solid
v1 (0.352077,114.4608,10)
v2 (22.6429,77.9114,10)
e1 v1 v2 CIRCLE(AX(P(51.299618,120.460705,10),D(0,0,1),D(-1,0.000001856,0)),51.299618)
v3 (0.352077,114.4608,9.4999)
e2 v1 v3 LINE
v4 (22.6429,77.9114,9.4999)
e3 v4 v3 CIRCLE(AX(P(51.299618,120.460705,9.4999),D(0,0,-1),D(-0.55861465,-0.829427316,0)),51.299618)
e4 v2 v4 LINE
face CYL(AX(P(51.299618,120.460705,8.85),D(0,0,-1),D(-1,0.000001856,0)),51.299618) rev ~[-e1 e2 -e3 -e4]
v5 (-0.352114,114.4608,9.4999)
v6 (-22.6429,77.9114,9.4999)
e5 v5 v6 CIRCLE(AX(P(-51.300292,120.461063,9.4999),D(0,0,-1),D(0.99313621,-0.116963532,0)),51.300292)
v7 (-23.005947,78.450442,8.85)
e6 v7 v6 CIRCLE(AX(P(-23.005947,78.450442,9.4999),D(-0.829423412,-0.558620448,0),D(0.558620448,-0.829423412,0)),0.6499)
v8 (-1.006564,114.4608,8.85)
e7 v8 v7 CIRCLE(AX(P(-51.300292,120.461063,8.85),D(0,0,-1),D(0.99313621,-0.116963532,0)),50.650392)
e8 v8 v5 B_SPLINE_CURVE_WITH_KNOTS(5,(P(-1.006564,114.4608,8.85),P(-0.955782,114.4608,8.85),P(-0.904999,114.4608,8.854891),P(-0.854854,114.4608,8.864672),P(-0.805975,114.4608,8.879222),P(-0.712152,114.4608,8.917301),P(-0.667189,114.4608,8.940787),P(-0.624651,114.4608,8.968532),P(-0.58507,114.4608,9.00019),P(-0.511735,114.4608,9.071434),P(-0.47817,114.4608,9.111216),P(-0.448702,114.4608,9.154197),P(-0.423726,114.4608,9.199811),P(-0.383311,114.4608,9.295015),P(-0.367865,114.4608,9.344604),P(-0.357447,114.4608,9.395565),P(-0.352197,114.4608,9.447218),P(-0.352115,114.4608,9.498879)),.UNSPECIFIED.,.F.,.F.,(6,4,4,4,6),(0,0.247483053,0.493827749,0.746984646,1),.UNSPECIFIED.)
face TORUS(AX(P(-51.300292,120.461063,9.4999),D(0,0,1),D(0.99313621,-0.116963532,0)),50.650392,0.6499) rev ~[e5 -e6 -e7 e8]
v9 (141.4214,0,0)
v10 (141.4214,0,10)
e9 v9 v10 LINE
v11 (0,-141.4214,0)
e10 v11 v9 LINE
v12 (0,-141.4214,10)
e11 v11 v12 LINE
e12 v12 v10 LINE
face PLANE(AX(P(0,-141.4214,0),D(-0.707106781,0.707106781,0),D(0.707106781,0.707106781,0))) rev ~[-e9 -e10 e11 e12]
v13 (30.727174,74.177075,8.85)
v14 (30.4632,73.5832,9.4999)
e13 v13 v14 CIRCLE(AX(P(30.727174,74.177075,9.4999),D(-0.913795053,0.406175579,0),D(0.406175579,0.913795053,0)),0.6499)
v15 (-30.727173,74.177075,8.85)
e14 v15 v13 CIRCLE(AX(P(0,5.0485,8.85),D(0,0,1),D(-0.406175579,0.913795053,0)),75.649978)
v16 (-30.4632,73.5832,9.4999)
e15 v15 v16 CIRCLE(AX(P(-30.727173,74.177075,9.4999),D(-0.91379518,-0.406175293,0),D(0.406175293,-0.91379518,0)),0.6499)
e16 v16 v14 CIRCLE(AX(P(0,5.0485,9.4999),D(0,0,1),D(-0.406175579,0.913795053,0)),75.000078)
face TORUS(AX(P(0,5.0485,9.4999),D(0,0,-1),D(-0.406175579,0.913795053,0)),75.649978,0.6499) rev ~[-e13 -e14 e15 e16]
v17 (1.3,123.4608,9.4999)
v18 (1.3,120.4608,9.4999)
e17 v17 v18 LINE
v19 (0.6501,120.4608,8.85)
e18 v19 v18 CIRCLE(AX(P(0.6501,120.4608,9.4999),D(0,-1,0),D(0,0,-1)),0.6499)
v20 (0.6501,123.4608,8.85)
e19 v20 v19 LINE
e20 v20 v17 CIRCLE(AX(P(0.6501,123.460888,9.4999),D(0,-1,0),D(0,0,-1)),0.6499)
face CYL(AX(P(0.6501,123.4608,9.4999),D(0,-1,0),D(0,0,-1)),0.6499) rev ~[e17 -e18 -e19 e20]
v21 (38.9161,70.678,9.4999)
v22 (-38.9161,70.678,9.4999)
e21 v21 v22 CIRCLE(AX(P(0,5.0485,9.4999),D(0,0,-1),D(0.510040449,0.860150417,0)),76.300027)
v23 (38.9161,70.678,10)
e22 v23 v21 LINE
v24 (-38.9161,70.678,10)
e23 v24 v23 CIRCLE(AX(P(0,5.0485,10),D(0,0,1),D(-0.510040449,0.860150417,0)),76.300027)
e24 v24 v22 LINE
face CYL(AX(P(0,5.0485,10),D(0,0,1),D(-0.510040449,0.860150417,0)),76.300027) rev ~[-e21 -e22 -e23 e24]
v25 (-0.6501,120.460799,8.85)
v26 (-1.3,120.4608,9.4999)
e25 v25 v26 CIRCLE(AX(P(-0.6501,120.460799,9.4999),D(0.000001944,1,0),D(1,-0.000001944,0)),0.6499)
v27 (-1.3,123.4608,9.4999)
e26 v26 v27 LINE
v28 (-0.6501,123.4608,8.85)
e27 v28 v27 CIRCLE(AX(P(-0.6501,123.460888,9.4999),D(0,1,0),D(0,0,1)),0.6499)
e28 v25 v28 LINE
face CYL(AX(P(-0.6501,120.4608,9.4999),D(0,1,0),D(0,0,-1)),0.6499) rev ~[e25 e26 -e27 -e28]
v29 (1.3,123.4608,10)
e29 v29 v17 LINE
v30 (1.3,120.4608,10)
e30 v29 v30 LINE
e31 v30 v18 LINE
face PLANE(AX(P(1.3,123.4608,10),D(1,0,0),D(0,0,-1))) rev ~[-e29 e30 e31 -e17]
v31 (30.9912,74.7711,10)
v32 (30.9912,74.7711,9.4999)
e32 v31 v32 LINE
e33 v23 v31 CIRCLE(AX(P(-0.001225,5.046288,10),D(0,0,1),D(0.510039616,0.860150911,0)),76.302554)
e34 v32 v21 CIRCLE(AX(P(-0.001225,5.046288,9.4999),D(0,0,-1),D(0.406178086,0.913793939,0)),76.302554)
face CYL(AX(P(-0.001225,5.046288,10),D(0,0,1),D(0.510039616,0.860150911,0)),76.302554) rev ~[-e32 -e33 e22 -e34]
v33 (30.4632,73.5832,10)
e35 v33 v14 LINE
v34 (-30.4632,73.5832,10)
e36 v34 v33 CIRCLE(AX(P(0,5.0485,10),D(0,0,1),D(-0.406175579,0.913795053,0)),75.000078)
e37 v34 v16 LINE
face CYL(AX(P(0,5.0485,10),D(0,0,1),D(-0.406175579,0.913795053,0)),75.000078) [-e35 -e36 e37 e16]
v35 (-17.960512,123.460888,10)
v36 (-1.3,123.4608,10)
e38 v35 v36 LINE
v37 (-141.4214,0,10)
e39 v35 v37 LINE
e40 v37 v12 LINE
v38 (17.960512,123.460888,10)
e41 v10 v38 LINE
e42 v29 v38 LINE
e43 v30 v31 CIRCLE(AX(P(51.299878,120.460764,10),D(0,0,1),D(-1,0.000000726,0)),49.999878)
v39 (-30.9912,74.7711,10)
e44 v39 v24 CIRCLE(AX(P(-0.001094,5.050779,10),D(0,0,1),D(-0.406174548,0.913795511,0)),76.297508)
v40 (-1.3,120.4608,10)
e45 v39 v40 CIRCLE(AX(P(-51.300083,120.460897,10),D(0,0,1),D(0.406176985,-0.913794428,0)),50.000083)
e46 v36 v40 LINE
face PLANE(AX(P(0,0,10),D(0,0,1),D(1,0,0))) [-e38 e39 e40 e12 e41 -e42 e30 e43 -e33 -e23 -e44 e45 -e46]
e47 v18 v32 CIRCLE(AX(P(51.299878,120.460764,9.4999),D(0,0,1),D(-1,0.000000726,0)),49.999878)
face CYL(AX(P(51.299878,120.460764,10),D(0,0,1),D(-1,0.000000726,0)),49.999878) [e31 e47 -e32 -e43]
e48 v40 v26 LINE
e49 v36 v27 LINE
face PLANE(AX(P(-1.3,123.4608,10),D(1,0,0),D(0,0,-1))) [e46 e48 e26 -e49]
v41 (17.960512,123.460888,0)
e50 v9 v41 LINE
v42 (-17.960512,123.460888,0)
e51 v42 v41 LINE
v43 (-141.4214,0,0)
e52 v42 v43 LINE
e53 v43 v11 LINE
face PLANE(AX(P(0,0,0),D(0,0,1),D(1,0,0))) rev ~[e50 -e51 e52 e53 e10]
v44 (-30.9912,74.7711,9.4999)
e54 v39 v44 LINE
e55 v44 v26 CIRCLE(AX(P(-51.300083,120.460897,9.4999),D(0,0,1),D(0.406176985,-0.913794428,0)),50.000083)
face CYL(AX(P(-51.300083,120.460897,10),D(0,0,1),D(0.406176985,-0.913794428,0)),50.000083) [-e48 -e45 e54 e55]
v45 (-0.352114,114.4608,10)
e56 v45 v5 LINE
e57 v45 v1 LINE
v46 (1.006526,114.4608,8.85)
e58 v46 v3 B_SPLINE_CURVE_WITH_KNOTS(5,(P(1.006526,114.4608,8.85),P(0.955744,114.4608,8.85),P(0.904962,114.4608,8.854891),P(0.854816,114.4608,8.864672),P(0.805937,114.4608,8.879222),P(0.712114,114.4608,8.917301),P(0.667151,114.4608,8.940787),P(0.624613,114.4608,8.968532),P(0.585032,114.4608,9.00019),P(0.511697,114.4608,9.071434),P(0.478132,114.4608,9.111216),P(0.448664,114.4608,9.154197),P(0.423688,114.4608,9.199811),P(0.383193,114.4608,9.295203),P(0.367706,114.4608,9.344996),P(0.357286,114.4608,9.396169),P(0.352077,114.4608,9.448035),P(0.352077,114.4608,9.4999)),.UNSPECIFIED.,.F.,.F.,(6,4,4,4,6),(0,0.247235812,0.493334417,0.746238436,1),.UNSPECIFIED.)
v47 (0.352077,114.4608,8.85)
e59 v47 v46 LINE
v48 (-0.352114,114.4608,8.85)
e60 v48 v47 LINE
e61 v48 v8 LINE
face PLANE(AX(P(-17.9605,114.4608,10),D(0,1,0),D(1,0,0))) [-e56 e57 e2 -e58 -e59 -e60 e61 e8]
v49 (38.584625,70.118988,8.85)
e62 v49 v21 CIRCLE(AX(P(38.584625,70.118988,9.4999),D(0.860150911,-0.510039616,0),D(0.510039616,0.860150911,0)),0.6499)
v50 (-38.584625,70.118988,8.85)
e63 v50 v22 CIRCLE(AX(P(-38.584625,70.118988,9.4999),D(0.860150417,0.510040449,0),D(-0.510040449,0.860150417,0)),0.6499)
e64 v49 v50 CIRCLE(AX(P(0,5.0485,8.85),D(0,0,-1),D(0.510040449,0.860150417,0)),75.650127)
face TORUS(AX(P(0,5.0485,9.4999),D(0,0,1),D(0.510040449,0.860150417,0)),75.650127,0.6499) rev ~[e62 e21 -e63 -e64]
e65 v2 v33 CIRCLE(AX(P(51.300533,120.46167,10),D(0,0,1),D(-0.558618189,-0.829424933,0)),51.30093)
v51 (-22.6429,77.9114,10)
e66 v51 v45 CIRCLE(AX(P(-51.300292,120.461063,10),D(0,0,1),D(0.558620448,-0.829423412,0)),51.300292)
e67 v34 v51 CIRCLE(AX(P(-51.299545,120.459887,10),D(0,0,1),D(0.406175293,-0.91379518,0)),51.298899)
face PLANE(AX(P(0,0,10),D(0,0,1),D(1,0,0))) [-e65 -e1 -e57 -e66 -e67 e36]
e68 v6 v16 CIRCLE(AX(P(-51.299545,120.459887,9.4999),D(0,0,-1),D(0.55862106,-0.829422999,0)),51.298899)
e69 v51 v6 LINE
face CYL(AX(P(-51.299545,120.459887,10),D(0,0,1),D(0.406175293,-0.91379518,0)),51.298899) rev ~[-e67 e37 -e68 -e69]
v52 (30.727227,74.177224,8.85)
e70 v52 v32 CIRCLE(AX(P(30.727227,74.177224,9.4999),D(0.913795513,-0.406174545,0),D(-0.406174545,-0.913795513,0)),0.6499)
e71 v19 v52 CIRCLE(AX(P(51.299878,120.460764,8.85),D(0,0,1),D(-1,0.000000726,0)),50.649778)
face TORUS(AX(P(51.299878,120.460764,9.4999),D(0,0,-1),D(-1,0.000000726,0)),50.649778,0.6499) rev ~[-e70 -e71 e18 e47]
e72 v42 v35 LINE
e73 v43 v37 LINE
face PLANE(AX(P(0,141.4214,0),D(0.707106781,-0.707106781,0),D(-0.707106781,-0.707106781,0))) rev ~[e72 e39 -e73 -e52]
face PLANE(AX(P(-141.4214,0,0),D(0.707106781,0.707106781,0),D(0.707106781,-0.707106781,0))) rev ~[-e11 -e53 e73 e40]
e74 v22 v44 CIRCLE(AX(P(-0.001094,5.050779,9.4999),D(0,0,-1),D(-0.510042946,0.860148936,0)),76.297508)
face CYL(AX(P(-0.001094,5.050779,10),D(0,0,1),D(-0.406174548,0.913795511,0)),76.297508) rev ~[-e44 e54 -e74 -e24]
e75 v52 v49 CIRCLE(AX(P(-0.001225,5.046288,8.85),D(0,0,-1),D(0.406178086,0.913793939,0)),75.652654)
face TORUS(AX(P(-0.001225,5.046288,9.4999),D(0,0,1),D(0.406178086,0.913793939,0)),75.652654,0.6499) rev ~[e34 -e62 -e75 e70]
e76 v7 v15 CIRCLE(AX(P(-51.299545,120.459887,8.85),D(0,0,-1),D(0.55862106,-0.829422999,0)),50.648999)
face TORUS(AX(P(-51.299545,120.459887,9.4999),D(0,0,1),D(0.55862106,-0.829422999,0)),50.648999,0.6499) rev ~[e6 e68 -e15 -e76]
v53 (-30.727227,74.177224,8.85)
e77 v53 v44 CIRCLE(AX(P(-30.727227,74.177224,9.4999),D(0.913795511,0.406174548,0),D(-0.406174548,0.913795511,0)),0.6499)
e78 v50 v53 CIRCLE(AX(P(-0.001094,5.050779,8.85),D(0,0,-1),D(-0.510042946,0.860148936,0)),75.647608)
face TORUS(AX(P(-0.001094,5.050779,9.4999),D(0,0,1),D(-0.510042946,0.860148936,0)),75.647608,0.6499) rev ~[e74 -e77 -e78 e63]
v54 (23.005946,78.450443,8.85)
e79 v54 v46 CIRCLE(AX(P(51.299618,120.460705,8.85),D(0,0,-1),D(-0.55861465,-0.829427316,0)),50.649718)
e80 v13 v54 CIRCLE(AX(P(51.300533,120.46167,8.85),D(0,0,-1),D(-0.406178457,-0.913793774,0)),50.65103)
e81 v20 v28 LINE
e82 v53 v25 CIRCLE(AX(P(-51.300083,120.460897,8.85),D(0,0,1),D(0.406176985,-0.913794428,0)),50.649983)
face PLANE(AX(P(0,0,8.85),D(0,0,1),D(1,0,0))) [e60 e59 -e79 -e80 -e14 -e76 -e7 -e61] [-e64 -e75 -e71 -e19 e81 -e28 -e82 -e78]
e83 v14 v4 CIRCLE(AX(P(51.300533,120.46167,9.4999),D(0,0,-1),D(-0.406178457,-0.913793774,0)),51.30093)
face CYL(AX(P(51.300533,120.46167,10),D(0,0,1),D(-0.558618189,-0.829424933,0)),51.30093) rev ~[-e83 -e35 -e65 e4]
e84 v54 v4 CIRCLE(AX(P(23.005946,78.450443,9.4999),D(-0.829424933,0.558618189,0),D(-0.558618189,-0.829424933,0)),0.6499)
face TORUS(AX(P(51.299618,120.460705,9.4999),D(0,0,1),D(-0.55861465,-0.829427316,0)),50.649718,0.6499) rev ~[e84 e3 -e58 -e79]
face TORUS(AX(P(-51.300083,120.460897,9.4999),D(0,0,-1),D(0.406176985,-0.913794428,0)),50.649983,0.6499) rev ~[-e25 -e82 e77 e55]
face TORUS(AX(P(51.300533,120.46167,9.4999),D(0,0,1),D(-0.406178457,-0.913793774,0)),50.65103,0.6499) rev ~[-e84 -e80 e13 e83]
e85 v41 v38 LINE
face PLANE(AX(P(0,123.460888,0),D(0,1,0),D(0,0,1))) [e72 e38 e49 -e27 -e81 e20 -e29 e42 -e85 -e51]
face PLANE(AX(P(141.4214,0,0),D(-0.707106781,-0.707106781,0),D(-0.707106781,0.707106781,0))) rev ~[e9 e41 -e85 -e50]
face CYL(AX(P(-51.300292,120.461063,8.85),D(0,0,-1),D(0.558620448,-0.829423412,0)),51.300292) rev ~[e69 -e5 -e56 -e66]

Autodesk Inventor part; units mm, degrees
ref_plane "YZ Plane" through (0, 0, 0) normal (1, 0, 0) x (0, 1, 0)
ref_plane "XZ Plane" through (0, 0, 0) normal (0, 1, 0) x (-1, 0, 0)
ref_plane "XY Plane" through (0, 0, 0) normal (0, 0, 1) x (1, 0, 0)
sketch "Sketch11" plane through (0, 0, 0) normal (0, 0, 1) x (1, 0, 0)
  line L0 (0, -141.4214) -> (141.4214, 0)
  line L1 (141.4214, 0) -> (0, 141.4214)
  line L2 (0, 141.4214) -> (-141.4214, 0)
  line L3 (-141.4214, 0) -> (0, -141.4214)
  line L4 (0, -141.4214) -> (0, 141.4214) construction
  line L5 (141.4214, 0) -> (-141.4214, 0) construction
  line L6 (0, -141.4214) -> (200, -141.4214) construction
  point P0 (0, 0)
  dimension "d80" = 200
  dimension "d81" = 45
  dimension "d82" = 200
extrude "Extrusion12" add sketch "Sketch11" along normal blind 10
chamfer "Chamfer1" distance 25.4 angle 45 1 edges at (0, 141.4214, 5)
sketch "Sketch13" plane through (0, 0, 10) normal (0, 0, 1) x (1, 0, 0)
  line L0 (72.5, 123.4608) -> (-72.5, 123.4608)
  arc A0 (-30.4632, 73.5832) -> (30.4632, 73.5832) centre (0, 5.0485) ccw
  arc A1 (-30.9912, 74.7711) -> (-38.9161, 70.678) centre (0, 5.0485) ccw
  arc A2 (-30.9912, 74.7711) -> (-1.3, 120.4608) centre (-51.3, 120.4608) ccw
  arc A3 (30.9912, 74.7711) -> (80.4111, 79.8094) centre (51.3, 120.4608) ccw
  arc A4 (-38.9161, 70.678) -> (-30.4632, 73.5832) centre (-51.3, 120.4608) ccw
  arc A5 (22.6429, 77.9114) -> (30.4632, 73.5832) centre (51.3, 120.4608) ccw
  line L1 (-51.3, 120.4608) -> (51.3, 120.4608)
  arc A6 (-80.4111, 79.8094) -> (-30.9912, 74.7711) centre (-51.3, 120.4608) ccw
  arc A7 (-80.3294, 78.1644) -> (-38.9161, 70.678) centre (-51.3, 120.4608) ccw
  arc A8 (-1.3, 120.4608) -> (-80.4111, 79.8094) centre (-51.3, 120.4608) ccw
  arc A9 (-30.4632, 73.5832) -> (-22.6429, 77.9114) centre (-51.3, 120.4608) ccw
  arc A10 (30.4632, 73.5832) -> (-30.4632, 73.5832) centre (0, 5.0485) ccw
  arc A11 (-22.6429, 77.9114) -> (-30.9912, 74.7711) centre (0, 5.0485) ccw
  arc A12 (-38.9161, 70.678) -> (38.9161, 70.678) centre (0, 5.0485) ccw
  arc A13 (22.6429, 77.9114) -> (-22.6429, 77.9114) centre (0, 5.0485) ccw
  arc A14 (30.9912, 74.7711) -> (22.6429, 77.9114) centre (0, 5.0485) ccw
  arc A15 (0, 120.4608) -> (22.6429, 77.9114) centre (51.3, 120.4608) ccw
  arc A16 (1.3, 120.4608) -> (30.9912, 74.7711) centre (51.3, 120.4608) ccw
  arc A17 (0, 120.4608) -> (-80.3294, 78.1644) centre (-51.3, 120.4608) ccw
  arc A18 (-22.6429, 77.9114) -> (0, 120.4608) centre (-51.3, 120.4608) ccw
  arc A19 (30.4632, 73.5832) -> (38.9161, 70.678) centre (51.3, 120.4608) ccw
  arc A20 (38.9161, 70.678) -> (30.9912, 74.7711) centre (0, 5.0485) ccw
  arc A21 (38.9161, 70.678) -> (102.4649, 116.7406) centre (51.3, 120.4608) ccw
  arc A22 (80.4111, 79.8094) -> (1.3, 120.4608) centre (51.3, 120.4608) ccw
  arc A23 (102.4649, 116.7406) -> (0, 120.4608) centre (51.3, 120.4608) ccw
  line L2 (-17.9605, 123.4608) -> (17.9605, 123.4608) projected
  line L3 (-17.9605, 123.4608) -> (-141.4214, 0) projected
  line L4 (-141.4214, 0) -> (0, -141.4214) projected
  line L5 (0, -141.4214) -> (141.4214, 0) projected
  line L6 (141.4214, 0) -> (17.9605, 123.4608) projected
  point P0 (0, 0)
  point P1 (0, 0)
  point P2 (0, 120.4608)
  dimension "d97" = 1.3
  dimension "d98" = 1.3
  dimension "d99" = 1.3
  dimension "d100" = 100
  dimension "d101" = 100
  dimension "d102" = 150
  dimension "d103" = 3
  dimension "d111" = 17.9605
  dimension "d112" = 35.921
extrude "Extrusion13" cut sketch "Sketch13" against normal blind 1.15 contours A16 A14 A15 L1 | A18 A11 A2 L1 | A15 A13 A18 | A20 A19 A5 A14 | A9 A4 A1 A11 | A12 A4 A0 A19
sketch "Sketch14" plane through (0, 0, 8.85) normal (0, 0, 1) x (1, 0, 0)
  arc A0 (-22.6429, 77.9114) -> (0, 120.4608) centre (-51.3, 120.4608) ccw projected
  arc A1 (0, 120.4608) -> (22.6429, 77.9114) centre (51.3, 120.4608) ccw projected
  arc A2 (22.6429, 77.9114) -> (-22.6429, 77.9114) centre (0, 5.0485) ccw projected
  point P0 (0, 0)
extrude "Extrusion14" add sketch "Sketch14" along normal up to surface (1.15 mm away)
sketch "Sketch15" plane through (-17.9605, 123.4608, 10) normal (0, 1, 0) x (1, 0, 0)
  line L0 (19.2605, 0) -> (19.2605, 1.15) projected
  line L1 (16.6605, 0) -> (16.6605, 1.15) projected
  line L2 (16.6605, 1.15) -> (17.9605, 1.15) projected
  line L3 (17.9605, 1.15) -> (19.2605, 1.15) projected
  line L4 (19.2605, 1.15) -> (48.9517, 1.15) projected
  line L5 (19.2605, 1.15) -> (16.6605, 1.15)
  line L6 (16.6605, 1.15) -> (16.6605, 0)
  line L7 (16.6605, 0) -> (19.2605, 0)
  line L8 (19.2605, 0) -> (19.2605, 1.15)
  point P0 (17.9605, 10)
extrude "Extrusion15" cut sketch "Sketch15" against normal blind 9
fillet "Fillet2" radius 0.65 8 edges at (9.3748, 93.216, 8.85) (-4.4597, -71.121, 8.85) (-9.3748, 93.216, 8.85) (-1.3, 121.9608, 8.85) (1.3, 121.9608, 8.85) (0, -69.9515, 8.85) (-9.9961, 90.0358, 8.85) (9.9961, 90.0358, 8.85)
equation "\"d80\" = ScintillatorWidth"
equation "\"d82\" = ScintillatorHeight"
equation "\"d83\" = ScintillatorThickness"
equation "\"d85\" = cornerChamfer"
equation "\"d111\" = 0.5 * d112"
equation "\"d117\" = 3 * ScintillatorEdgeClearence"
equation "\"d119\" = OpticalFiberClearence + 0.5 * OpticalFiberDiameter"
equation "\"d5\" = OpticalFiberDiameter + 2 * OpticalFiberClearence"
equation "\"d21\" = d5"
equation "\"d22\" = d5"
equation "\"OpticalFiberDiameter\" = 1"
equation "\"ScintillatorThickness\" = 10"
equation "\"OpticalFiberClearence\" = 0.15"
equation "\"ScintillatorEdgeClearence\" = 3"
equation "\"ScintillatorWidth\" = 200"
equation "\"ScintillatorHeight\" = 200"
equation "\"LoopLargeTrackRatio\" = 1.5"
equation "\"cornerChamfer\" = 25.4"
equation "\"d106\" = 3"
equation "\"d107\" = 1"
equation "\"d108\" = 1.1"
equation "\"d109\" = 145"
equation "\"d110\" = 0.15"
equation "\"FiberEdgeOffsett\" = 5"
equation "\"FiberSensorClerence\" = 0.5"
equation "\"mountingSpacing\" = 18"
equation "\"silveringThickness\" = 0.2"
properties part number "Scintillator Tile" material "ABS Plastic"
